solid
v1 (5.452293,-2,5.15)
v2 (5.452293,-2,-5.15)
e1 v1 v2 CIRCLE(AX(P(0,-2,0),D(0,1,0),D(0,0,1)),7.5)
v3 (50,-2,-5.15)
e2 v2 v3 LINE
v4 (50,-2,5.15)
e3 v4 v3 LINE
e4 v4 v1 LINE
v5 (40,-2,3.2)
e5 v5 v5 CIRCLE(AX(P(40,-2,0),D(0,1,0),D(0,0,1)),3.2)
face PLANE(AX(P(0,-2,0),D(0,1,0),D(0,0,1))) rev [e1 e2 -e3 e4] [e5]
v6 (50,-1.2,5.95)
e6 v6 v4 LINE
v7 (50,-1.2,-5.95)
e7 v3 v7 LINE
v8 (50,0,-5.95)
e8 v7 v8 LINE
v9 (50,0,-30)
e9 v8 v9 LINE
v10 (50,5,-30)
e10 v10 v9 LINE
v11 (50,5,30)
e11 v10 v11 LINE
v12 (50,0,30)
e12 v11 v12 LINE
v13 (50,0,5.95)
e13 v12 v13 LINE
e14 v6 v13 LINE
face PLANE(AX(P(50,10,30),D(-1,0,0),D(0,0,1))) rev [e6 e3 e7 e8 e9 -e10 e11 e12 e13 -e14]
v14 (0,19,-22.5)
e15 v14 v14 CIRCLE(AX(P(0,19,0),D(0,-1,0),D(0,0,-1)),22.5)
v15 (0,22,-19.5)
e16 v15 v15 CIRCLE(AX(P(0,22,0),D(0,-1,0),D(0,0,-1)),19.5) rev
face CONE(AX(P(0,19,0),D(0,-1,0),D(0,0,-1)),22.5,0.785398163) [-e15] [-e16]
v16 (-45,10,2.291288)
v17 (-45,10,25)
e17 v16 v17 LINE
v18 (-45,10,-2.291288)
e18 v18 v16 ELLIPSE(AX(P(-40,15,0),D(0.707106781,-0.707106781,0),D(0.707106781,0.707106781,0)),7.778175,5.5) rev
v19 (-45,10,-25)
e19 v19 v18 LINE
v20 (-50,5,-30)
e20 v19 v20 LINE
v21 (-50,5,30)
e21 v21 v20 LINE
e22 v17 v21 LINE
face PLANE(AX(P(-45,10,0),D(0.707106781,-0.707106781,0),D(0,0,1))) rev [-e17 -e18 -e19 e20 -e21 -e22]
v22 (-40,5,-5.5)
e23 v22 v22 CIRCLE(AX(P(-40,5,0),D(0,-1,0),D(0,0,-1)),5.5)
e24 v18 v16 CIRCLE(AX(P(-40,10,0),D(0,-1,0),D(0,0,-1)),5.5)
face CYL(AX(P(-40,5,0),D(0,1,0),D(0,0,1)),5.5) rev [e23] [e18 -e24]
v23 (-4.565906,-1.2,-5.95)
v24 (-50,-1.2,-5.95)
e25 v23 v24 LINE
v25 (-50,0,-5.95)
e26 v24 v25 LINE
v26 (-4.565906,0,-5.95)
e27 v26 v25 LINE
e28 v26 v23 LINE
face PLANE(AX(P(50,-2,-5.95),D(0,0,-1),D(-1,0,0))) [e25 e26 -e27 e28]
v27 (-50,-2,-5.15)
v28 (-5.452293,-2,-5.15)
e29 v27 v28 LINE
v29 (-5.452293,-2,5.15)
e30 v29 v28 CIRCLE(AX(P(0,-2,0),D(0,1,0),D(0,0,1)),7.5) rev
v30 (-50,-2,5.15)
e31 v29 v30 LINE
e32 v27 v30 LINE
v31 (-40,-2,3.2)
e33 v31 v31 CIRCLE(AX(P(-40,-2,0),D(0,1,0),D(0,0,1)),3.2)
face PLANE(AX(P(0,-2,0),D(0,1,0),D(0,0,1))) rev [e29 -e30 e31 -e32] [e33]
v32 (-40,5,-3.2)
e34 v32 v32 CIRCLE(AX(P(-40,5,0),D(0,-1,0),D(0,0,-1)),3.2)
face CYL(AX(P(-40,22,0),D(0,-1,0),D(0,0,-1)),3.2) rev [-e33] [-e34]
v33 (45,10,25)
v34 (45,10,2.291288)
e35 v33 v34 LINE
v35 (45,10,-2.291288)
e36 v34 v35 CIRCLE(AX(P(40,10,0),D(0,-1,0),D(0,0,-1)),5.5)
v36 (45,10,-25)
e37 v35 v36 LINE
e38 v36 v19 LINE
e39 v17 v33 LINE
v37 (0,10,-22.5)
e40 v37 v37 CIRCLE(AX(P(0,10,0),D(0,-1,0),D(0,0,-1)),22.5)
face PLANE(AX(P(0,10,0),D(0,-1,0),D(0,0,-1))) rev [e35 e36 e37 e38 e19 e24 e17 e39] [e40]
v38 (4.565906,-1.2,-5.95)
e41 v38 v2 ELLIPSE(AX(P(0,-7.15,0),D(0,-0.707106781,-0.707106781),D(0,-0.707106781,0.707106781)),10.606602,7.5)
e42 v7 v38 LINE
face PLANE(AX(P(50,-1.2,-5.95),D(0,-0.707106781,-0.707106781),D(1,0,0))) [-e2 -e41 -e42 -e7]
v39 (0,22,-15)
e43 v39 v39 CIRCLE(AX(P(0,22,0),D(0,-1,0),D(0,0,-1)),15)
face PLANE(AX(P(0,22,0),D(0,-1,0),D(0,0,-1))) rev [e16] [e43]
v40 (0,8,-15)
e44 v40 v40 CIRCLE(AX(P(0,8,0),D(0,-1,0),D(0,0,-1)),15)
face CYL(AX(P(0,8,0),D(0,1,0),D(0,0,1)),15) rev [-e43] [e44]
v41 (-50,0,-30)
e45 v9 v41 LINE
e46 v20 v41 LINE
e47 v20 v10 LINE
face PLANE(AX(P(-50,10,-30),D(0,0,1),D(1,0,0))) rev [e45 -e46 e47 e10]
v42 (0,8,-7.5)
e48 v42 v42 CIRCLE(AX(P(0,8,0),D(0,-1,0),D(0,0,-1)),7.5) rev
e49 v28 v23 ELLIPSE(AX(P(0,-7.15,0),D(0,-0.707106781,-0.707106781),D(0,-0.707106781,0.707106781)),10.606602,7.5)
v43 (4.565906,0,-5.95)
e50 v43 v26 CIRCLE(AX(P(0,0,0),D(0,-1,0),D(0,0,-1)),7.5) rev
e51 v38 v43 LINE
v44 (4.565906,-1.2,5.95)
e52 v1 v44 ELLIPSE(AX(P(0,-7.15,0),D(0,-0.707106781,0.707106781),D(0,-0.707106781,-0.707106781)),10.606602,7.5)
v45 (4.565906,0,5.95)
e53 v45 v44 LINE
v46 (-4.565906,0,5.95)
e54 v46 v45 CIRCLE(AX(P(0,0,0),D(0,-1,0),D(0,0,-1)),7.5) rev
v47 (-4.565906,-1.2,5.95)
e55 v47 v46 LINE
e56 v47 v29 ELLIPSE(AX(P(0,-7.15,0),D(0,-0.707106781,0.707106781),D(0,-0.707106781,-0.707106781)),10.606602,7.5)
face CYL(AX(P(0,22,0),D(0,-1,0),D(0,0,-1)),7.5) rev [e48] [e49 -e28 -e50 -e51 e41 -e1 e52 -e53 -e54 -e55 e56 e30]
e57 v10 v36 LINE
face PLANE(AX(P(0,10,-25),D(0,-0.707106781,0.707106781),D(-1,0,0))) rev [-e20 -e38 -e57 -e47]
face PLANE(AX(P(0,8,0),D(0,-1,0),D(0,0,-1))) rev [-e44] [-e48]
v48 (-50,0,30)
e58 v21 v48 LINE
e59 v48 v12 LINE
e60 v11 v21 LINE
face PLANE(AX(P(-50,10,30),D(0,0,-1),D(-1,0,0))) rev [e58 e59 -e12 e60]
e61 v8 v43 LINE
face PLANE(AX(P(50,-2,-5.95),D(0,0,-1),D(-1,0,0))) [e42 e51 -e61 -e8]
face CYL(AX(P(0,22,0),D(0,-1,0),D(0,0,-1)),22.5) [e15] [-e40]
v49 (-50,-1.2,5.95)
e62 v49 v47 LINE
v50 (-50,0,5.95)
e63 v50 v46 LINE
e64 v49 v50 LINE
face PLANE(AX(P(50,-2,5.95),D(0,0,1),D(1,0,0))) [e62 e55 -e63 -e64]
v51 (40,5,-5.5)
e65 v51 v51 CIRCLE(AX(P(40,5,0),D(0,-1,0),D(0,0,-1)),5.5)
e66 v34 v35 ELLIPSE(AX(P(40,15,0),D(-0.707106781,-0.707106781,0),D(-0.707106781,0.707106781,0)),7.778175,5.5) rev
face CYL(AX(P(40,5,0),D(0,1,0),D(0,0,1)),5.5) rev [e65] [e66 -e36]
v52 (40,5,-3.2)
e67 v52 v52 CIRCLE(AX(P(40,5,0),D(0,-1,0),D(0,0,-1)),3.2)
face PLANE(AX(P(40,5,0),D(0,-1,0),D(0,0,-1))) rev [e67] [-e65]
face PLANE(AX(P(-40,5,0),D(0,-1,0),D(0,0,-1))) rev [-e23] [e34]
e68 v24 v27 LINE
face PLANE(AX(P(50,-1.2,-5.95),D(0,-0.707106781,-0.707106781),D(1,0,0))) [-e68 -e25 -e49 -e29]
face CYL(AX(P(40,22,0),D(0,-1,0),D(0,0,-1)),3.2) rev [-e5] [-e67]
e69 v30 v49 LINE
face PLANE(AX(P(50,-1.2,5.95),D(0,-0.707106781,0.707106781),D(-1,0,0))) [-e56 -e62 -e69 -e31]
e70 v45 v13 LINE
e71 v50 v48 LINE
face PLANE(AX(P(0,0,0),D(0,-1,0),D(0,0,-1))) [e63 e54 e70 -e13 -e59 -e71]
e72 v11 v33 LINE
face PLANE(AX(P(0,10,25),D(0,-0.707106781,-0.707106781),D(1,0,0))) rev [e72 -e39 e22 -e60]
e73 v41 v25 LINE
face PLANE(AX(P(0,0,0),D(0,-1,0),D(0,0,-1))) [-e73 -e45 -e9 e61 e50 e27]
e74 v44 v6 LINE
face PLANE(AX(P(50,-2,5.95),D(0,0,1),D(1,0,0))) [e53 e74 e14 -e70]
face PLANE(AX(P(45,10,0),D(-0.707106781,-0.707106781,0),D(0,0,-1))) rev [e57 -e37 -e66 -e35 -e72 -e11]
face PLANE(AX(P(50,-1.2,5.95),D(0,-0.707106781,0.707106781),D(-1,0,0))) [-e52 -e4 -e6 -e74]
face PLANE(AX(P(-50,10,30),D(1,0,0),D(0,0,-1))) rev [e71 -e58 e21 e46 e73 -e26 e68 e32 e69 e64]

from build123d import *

# Parameters (mm, degrees)
SKETCH1_W               = 100
SKETCH1_H               = 60
BOSS_EXTRUDE1_DEPTH     = 10
BOSS_EXTRUDE2_START     = 10
SKETCH3_R               = 22.5
BOSS_EXTRUDE2_DEPTH     = 12
CUT_EXTRUDE2_START      = 22
SKETCH4_R               = 15
CUT_EXTRUDE2_DEPTH      = 14
SKETCH6_W               = 100
SKETCH6_H               = 11.9
BOSS_EXTRUDE3_DEPTH     = 2
CUT_EXTRUDE1_DEPTH      = 63.321745804
CUT_EXTRUDE1_DEPTH_BACK = 63.321745804
SKETCH2_R               = 3.2
CUT_EXTRUDE3_DEPTH      = 63.321745804
CUT_EXTRUDE3_DEPTH_BACK = 63.321745804
SKETCH5_R               = 7.5
CUT_EXTRUDE4_START      = 10
SKETCH8_R               = 5.5
CUT_EXTRUDE4_DEPTH      = 5
CHAMFER1_SIZE           = 5
CHAMFER2_SIZE           = 3
CHAMFER3_SIZE           = 0.8


with BuildPart() as part:
    # Sketch1 → Boss-Extrude1 (new body)
    with BuildSketch(Plane(origin=(0, 0, 0), x_dir=(1, 0, 0), z_dir=(0, 1, 0))):
        Rectangle(SKETCH1_W, SKETCH1_H)
    extrude(amount=BOSS_EXTRUDE1_DEPTH)

    # Sketch3 → Boss-Extrude2 (add)
    with BuildSketch(Plane(origin=(0, 0, 0), x_dir=(1, 0, 0), z_dir=(0, 1, 0)).offset(BOSS_EXTRUDE2_START)):
        with Locations(Location((0, 0, 0), (0, 0, 90))):
            Circle(SKETCH3_R)
    extrude(amount=BOSS_EXTRUDE2_DEPTH)

    # Sketch4 → Cut-Extrude2 (cut)
    with BuildSketch(Plane(origin=(0, 0, 0), x_dir=(1, 0, 0), z_dir=(0, 1, 0)).offset(CUT_EXTRUDE2_START)):
        with Locations(Location((0, 0, 0), (0, 0, 90))):
            Circle(SKETCH4_R)
    extrude(amount=-CUT_EXTRUDE2_DEPTH, mode=Mode.SUBTRACT)

    # Sketch6 → Boss-Extrude3 (add)
    with BuildSketch(Plane(origin=(0, 0, 0), x_dir=(1, 0, 0), z_dir=(0, 1, 0))):
        Rectangle(SKETCH6_W, SKETCH6_H)
    extrude(amount=-BOSS_EXTRUDE3_DEPTH)

    # Sketch2 → Cut-Extrude1 (cut, two sides: drawn at the far end of the back side and taken through both)
    with BuildSketch(Plane(origin=(0, 0, 0), x_dir=(1, 0, 0), z_dir=(0, 1, 0)).offset(-CUT_EXTRUDE1_DEPTH_BACK)):
        with Locations(Location((-40, 0, 0), (0, 0, 90))):
            Circle(SKETCH2_R)
        with Locations(Location((40, 0, 0), (0, 0, 90))):
            Circle(SKETCH2_R)
    extrude(amount=CUT_EXTRUDE1_DEPTH + CUT_EXTRUDE1_DEPTH_BACK, mode=Mode.SUBTRACT)

    # Sketch5 → Cut-Extrude3 (cut, two sides: drawn at the far end of the back side and taken through both)
    with BuildSketch(Plane(origin=(0, 0, 0), x_dir=(1, 0, 0), z_dir=(0, 1, 0)).offset(-CUT_EXTRUDE3_DEPTH_BACK)):
        with Locations(Location((0, 0, 0), (0, 0, 90))):
            Circle(SKETCH5_R)
    extrude(amount=CUT_EXTRUDE3_DEPTH + CUT_EXTRUDE3_DEPTH_BACK, mode=Mode.SUBTRACT)

    # Sketch8 → Cut-Extrude4 (cut)
    with BuildSketch(Plane(origin=(0, 0, 0), x_dir=(1, 0, 0), z_dir=(0, 1, 0)).offset(CUT_EXTRUDE4_START)):
        with Locations(Location((40, 0, 0), (0, 0, 90))):
            Circle(SKETCH8_R)
        with Locations(Location((-40, 0, 0), (0, 0, 90))):
            Circle(SKETCH8_R)
    extrude(amount=-CUT_EXTRUDE4_DEPTH, mode=Mode.SUBTRACT)

    # Chamfer1
    # the kernel refuses this chamfer: 5 mm, written as the material it takes off along each edge
    with BuildSketch(Plane(origin=(-50, 10, -42.85841494), x_dir=(0.9996219169112968, 0.027495876610586317, 0), z_dir=(0, 0, 1)), Plane(origin=(50, 10, 42.85841494), x_dir=(-0.9996219169112968, 0.027495876610586317, 0), z_dir=(0, 0, -1))) as chamfer1_piece_1:
        Polygon((CHAMFER1_SIZE * 0.999621916911, -CHAMFER1_SIZE * 0.0274958766106), (-CHAMFER1_SIZE * 0.0274958766106, -CHAMFER1_SIZE * 0.999621916911), (0, 0), align=None)
    extrude(amount=85.71682988, mode=Mode.SUBTRACT)
    with BuildSketch(Plane(origin=(-62.85841494, 10, 30), x_dir=(0, -0.9996219169112968, 0.027495876610586317), z_dir=(1, 0, 0))) as chamfer1_piece_2:
        Polygon((CHAMFER1_SIZE * 0.999621916911, CHAMFER1_SIZE * 0.0274958766106), (-CHAMFER1_SIZE * 0.0274958766106, CHAMFER1_SIZE * 0.999621916911), (0, 0), align=None)
    extrude(amount=125.71682988, mode=Mode.SUBTRACT)
    with BuildSketch(Plane(origin=(62.85841494, 10, -30), x_dir=(0, 0.027495876610586317, 0.9996219169112968), z_dir=(-1, 0, 0))) as chamfer1_piece_3:
        Polygon((CHAMFER1_SIZE * 0.999621916911, -CHAMFER1_SIZE * 0.0274958766106), (-CHAMFER1_SIZE * 0.0274958766106, -CHAMFER1_SIZE * 0.999621916911), (0, 0), align=None)
    extrude(amount=125.71682988, mode=Mode.SUBTRACT)

    # Chamfer2
    chamfer2_edges = [part.edges().sort_by_distance(p)[0] for p in [
        (0, 22, 22.5),
    ]]
    chamfer(chamfer2_edges, length=CHAMFER2_SIZE)

    # Chamfer3
    chamfer3_edges = [part.edges().sort_by_distance(p)[0] for p in [
        (27.282953131, -2, -5.95),
        (-27.282953131, -2, 5.95),
        (-27.282953131, -2, -5.95),
        (27.282953131, -2, 5.95),
    ]]
    chamfer(chamfer3_edges, length=CHAMFER3_SIZE)


solid = part.part
